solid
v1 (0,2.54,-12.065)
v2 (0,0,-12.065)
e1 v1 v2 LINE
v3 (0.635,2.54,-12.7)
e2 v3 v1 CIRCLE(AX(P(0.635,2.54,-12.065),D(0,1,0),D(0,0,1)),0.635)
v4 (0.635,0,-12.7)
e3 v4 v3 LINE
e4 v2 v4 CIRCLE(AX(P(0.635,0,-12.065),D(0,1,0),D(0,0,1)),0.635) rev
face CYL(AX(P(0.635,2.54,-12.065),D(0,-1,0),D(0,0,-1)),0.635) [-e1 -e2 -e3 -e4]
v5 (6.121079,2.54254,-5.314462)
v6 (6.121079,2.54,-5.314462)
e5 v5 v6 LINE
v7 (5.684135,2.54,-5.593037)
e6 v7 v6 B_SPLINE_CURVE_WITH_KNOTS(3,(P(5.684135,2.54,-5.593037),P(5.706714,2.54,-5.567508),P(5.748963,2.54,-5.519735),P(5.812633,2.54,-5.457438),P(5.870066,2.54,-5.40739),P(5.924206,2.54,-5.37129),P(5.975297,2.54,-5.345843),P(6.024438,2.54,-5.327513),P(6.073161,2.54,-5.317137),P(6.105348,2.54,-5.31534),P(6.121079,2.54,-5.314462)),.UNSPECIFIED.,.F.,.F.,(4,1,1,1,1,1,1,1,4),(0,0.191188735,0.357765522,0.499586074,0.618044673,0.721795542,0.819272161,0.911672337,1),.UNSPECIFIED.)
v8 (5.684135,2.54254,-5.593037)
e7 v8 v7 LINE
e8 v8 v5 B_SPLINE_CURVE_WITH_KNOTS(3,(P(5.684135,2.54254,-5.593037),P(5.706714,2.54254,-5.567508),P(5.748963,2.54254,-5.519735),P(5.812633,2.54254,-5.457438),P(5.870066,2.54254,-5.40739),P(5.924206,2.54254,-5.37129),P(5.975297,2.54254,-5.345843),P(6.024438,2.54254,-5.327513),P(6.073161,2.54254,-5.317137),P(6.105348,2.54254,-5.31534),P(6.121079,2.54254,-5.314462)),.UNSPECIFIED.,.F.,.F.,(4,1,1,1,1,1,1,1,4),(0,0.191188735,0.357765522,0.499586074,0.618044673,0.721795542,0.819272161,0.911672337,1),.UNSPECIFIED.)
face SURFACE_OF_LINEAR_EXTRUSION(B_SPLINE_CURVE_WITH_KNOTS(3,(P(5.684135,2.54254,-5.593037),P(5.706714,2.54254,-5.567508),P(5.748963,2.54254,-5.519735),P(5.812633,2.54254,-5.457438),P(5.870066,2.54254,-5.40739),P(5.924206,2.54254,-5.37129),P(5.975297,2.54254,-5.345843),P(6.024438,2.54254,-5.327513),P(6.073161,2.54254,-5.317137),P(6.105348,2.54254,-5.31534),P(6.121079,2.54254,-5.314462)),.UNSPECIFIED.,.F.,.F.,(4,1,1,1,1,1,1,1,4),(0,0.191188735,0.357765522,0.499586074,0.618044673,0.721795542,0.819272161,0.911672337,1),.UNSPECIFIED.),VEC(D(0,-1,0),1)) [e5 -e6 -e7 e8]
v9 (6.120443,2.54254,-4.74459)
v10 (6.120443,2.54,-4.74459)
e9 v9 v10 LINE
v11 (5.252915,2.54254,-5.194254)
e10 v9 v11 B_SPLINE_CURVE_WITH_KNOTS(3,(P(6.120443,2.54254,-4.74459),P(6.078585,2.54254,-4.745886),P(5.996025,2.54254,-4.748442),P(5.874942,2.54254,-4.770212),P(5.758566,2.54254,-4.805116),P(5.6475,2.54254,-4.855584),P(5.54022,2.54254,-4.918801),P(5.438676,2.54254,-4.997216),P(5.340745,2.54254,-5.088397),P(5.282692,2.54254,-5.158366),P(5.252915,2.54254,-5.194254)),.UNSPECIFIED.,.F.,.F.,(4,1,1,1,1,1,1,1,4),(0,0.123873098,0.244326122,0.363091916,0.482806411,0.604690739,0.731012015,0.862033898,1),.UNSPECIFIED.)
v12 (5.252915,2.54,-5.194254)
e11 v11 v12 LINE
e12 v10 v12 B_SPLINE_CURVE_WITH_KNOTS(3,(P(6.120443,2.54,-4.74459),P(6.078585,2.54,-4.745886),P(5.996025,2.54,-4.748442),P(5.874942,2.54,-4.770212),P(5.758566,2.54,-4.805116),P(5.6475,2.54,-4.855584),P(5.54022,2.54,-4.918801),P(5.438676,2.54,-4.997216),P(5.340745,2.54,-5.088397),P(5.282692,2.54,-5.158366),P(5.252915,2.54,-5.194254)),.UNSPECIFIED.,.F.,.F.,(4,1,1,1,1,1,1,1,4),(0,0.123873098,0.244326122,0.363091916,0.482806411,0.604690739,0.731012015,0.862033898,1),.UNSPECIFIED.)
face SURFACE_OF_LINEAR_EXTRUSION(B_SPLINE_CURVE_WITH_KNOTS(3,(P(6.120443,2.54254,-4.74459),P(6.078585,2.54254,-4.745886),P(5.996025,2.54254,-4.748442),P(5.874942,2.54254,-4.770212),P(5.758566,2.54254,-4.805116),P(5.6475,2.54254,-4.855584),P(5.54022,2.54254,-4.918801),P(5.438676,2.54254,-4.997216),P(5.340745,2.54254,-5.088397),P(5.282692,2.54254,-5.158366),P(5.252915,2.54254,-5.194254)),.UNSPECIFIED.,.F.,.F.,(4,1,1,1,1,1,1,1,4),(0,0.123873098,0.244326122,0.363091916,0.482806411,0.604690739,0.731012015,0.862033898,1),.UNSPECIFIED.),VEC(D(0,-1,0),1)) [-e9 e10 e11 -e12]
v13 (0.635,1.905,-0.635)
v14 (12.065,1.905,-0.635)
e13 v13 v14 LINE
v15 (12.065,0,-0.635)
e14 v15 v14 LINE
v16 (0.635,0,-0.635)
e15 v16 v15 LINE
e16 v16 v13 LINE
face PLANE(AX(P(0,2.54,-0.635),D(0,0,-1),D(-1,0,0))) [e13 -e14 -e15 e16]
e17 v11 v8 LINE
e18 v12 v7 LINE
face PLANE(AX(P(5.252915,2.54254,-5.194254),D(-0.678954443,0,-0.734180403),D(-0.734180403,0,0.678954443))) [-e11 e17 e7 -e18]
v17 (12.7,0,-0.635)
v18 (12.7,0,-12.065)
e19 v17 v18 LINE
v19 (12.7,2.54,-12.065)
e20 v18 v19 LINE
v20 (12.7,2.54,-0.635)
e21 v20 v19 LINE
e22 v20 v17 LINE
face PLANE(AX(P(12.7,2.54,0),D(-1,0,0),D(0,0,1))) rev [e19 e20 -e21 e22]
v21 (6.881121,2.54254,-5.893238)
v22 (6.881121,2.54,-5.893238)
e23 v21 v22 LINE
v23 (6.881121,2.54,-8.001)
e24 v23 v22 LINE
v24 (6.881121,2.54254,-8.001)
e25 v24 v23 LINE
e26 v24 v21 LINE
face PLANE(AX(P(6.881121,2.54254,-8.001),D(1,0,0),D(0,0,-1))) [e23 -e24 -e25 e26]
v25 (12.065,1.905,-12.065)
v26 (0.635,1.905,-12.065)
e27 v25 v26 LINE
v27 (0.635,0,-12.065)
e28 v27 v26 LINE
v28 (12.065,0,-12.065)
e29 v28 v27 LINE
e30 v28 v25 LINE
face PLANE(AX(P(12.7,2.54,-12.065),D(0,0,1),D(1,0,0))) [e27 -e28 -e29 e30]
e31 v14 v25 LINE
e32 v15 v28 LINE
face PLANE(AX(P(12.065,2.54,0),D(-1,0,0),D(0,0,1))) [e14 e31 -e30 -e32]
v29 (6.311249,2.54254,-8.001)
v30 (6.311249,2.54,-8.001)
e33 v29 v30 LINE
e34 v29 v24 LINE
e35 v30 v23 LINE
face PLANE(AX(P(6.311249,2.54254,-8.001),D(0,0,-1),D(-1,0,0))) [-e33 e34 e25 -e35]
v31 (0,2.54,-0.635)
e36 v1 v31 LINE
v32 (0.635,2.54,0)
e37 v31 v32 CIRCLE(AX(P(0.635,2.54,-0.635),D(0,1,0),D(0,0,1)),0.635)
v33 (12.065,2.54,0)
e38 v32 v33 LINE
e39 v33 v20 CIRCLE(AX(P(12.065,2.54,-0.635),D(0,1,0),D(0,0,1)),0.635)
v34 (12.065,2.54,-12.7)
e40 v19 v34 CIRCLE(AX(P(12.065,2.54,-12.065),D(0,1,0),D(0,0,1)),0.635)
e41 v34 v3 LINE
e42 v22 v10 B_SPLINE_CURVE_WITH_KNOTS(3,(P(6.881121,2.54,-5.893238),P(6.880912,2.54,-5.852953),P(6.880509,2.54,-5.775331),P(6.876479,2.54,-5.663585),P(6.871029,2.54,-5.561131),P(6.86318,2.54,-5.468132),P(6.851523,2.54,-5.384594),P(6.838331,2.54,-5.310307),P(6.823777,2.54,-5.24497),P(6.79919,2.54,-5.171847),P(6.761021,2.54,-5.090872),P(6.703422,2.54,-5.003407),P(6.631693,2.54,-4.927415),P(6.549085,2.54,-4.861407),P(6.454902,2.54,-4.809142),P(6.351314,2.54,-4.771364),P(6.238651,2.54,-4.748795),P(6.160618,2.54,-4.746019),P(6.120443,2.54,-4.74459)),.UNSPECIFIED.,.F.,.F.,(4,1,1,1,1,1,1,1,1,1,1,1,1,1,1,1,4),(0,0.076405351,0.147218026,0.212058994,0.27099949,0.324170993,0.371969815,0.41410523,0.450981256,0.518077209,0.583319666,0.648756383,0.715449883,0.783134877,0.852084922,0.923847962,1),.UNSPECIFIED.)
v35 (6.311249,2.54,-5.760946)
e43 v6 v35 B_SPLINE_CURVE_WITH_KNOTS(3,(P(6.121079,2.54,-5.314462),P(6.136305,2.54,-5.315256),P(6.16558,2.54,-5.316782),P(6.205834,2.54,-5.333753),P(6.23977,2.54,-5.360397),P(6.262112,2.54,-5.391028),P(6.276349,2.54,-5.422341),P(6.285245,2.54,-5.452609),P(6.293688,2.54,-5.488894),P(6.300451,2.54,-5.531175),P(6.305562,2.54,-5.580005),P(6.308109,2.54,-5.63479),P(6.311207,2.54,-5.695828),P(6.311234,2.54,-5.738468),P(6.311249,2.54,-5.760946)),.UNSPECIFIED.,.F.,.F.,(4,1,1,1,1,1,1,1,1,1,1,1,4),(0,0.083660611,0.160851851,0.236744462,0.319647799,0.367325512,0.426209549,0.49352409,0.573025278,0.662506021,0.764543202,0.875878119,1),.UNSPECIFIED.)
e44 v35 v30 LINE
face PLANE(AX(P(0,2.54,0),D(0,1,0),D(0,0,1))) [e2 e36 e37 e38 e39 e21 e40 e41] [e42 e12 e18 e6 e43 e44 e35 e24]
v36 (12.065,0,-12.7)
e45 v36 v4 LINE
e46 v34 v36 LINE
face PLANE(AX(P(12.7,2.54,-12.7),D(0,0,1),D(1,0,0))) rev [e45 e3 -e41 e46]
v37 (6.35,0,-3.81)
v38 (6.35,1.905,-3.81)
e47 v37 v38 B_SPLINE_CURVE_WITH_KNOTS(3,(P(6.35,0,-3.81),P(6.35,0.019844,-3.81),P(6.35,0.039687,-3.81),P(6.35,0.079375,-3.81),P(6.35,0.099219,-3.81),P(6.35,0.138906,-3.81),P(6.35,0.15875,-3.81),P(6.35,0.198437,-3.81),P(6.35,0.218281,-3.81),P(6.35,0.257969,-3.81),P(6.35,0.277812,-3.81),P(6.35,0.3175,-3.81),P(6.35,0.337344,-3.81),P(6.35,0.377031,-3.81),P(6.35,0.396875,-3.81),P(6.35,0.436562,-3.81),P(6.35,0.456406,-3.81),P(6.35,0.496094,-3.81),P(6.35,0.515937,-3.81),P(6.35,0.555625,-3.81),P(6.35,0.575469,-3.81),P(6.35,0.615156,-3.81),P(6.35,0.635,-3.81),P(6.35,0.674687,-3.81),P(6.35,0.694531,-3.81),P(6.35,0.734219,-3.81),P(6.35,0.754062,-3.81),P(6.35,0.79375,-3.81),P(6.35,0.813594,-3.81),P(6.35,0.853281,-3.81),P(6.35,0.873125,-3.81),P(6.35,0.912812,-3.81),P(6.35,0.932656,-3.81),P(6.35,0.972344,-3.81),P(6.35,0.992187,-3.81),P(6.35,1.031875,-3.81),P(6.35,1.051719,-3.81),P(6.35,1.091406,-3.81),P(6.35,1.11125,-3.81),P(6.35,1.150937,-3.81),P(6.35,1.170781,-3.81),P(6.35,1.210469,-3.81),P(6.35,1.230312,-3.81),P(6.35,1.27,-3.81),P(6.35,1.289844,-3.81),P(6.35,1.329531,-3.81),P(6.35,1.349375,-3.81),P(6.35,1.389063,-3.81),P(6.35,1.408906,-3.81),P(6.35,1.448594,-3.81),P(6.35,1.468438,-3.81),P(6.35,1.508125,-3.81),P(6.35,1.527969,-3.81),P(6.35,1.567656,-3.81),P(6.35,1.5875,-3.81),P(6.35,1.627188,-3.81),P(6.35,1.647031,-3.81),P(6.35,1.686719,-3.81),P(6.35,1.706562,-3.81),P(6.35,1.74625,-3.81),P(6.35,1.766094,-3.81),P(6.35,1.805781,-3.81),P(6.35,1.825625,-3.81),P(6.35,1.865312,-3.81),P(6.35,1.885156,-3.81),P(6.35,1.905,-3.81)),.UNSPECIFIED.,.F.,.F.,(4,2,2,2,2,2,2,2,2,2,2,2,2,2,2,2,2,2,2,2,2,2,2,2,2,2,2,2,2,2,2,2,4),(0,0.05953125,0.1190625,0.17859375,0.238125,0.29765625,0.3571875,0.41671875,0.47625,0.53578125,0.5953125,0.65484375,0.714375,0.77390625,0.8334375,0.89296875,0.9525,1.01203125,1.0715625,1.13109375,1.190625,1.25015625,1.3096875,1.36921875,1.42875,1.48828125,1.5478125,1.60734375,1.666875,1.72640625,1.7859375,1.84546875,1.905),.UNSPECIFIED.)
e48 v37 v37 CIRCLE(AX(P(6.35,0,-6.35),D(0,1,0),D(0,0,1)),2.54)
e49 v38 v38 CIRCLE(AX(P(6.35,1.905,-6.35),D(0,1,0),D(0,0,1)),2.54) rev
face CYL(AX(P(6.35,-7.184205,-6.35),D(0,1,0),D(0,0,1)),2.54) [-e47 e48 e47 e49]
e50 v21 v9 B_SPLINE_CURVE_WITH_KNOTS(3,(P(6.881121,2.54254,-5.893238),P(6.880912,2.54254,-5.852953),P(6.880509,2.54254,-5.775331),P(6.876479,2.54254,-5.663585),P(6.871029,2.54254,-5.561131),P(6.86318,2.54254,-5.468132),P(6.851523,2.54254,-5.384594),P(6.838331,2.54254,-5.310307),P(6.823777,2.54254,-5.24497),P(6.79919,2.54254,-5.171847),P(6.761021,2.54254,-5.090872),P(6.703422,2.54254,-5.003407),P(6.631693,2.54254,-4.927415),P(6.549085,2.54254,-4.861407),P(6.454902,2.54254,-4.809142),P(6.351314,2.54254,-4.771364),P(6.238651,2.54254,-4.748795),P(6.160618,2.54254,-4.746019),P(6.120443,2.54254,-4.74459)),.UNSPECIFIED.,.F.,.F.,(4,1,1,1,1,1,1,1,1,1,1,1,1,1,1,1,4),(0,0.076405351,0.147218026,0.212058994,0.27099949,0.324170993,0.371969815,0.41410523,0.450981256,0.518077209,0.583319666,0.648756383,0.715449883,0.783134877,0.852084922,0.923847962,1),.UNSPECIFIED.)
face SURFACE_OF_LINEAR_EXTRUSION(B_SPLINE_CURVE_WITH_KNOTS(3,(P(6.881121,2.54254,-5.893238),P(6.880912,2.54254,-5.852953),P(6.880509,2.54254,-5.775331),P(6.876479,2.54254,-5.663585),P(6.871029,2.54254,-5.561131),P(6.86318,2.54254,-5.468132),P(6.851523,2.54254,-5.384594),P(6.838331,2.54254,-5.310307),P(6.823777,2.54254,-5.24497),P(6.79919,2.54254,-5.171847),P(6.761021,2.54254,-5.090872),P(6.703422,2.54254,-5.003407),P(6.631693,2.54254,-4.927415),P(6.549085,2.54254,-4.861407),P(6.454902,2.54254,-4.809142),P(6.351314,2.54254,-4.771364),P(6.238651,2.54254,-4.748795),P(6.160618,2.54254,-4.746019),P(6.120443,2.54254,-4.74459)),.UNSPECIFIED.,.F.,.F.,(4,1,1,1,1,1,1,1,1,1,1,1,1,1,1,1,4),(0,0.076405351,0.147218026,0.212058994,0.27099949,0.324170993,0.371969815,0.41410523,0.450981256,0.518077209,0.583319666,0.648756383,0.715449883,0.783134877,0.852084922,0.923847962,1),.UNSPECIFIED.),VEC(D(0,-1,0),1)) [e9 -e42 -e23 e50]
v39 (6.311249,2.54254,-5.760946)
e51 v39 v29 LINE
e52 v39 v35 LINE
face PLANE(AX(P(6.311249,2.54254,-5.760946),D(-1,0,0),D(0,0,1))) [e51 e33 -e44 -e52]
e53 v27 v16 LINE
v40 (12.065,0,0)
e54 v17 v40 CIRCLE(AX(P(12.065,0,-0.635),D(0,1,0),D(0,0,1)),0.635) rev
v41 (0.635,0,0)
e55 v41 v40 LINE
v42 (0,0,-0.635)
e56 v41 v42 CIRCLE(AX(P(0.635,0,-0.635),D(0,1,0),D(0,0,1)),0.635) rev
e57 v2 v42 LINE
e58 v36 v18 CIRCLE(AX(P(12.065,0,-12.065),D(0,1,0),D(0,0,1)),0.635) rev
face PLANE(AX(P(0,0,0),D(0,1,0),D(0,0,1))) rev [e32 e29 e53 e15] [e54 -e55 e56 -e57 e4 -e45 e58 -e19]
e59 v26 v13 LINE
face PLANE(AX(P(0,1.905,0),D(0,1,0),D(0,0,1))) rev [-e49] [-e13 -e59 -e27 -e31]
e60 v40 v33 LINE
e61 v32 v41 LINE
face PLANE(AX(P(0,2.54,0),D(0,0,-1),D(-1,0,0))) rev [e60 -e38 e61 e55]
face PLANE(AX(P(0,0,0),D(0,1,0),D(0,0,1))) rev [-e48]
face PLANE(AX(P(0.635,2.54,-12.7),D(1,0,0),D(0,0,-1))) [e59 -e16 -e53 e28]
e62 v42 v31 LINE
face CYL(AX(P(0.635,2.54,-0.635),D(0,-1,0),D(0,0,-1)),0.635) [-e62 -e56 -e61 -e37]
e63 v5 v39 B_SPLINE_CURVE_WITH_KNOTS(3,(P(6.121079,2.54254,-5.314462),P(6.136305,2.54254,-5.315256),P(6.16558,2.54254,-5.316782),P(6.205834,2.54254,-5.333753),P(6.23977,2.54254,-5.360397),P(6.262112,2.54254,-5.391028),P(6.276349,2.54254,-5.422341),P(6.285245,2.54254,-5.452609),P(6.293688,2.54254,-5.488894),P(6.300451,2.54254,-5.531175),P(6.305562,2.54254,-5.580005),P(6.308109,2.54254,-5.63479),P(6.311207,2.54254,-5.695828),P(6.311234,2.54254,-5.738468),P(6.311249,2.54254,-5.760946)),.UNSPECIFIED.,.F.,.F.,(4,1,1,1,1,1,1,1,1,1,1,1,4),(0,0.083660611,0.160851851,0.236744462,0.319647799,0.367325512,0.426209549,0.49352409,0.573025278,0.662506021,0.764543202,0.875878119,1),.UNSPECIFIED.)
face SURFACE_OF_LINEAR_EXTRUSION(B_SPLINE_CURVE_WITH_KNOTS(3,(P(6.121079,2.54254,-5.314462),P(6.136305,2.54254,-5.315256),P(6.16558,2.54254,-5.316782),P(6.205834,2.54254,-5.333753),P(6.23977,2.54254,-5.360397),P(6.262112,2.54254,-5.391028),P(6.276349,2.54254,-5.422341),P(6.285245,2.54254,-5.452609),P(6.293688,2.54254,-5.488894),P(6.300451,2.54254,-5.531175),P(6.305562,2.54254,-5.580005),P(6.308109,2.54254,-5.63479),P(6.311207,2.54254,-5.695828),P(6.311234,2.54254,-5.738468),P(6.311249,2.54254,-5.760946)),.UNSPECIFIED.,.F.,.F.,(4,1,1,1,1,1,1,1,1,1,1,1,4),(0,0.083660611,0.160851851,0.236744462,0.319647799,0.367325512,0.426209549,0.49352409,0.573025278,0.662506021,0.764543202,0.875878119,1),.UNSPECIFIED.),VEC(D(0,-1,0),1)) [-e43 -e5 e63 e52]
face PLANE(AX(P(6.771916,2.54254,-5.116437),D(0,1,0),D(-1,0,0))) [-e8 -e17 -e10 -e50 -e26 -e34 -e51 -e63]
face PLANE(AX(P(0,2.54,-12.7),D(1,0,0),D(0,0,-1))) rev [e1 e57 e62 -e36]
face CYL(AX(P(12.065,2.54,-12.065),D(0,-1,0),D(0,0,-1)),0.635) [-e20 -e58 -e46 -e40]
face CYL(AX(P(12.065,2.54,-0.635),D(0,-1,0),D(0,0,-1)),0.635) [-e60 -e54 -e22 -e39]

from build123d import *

# Parameters (mm, degrees)
SKETCH1_W           = 12.7
SKETCH1_H           = 12.7
BOSS_EXTRUDE1_DEPTH = 2.54
FILLET1_R           = 0.635
SHELL1_START        = 0.635
SHELL1_OUTLINE_W    = 1.905
SHELL1_OUTLINE_H    = 11.43
SHELL1_DEPTH        = 11.43
SKETCH2_R           = 2.54
BOSS_EXTRUDE2_DEPTH = 1.905
BOSS_EXTRUDE3_DEPTH = 0.00254


# Read off the part's stored shape, not the designer's step: Shell1
with BuildPart() as part:
    # Sketch1 → Boss-Extrude1 (new body)
    with BuildSketch(Plane(origin=(0, 0, 0), x_dir=(1, 0, 0), z_dir=(0, 1, 0))):
        with Locations((6.35, 6.35)):
            Rectangle(SKETCH1_W, SKETCH1_H)
    extrude(amount=BOSS_EXTRUDE1_DEPTH)

    # Fillet1
    fillet1_edges = [part.edges().sort_by_distance(p)[0] for p in [
        (0, 1.27, -12.7),
        (12.7, 1.27, -12.7),
        (12.7, 1.27, 0),
        (0, 1.27, 0),
    ]]
    fillet(fillet1_edges, radius=FILLET1_R)

    # Shell1 outline → Shell1 (cut)
    with BuildSketch(Plane.YZ.offset(SHELL1_START)):
        with Locations((0.9525, -6.35)):
            Rectangle(SHELL1_OUTLINE_W, SHELL1_OUTLINE_H)
    extrude(amount=SHELL1_DEPTH, mode=Mode.SUBTRACT)

    # Sketch2 → Boss-Extrude2 (add)
    with BuildSketch(Plane(origin=(0, 1.905, 0), x_dir=(-1, 0, 0), z_dir=(0, -1, 0))):
        with Locations(Location((-6.35, 6.35, 0), (0, 0, 270))):
            Circle(SKETCH2_R)
    extrude(amount=BOSS_EXTRUDE2_DEPTH)

    # Sketch3 → Boss-Extrude3 (add)
    with BuildSketch(Plane(origin=(0, 2.54, 0), x_dir=(1, 0, 0), z_dir=(0, 1, 0))):
        with BuildLine():
            Line((6.311248718, 8.001), (6.881120513, 8.001))
            Line((6.881120513, 8.001), (6.881120513, 5.89323758))
            add(Edge.make_bspline(
                [(6.881120513, 5.89323758), (6.880911581, 5.85295254), (6.88050901, 5.775331222), (6.876478561, 5.663585177), (6.871028683, 5.561130731), (6.863180334, 5.468132049), (6.851523386, 5.384593628), (6.83833126, 5.310307047), (6.823776683, 5.24496961), (6.799190432, 5.171846852), (6.76102099, 5.090871717), (6.703422211, 5.003407063), (6.631693296, 4.927415182), (6.549085279, 4.861407451), (6.454902126, 4.809141814), (6.351313596, 4.771364071), (6.238650837, 4.748795386), (6.160617709, 4.746019084), (6.120443429, 4.744589744)],
                knots=[0, 0, 0, 0, 1.22248561, 2.355488409, 3.392943897, 4.335991845, 5.186735882, 5.951517034, 6.625683685, 7.215700098, 8.28923535, 9.333114649, 10.380102123, 11.447198135, 12.530158036, 13.633358744, 14.781567393, 16, 16, 16, 16], degree=3))
            add(Edge.make_bspline(
                [(6.120443429, 4.744589744), (6.078585486, 4.745885617), (5.996025276, 4.748441587), (5.874942226, 4.77021188), (5.758566278, 4.80511621), (5.647499501, 4.855583683), (5.540220246, 4.918801011), (5.438675534, 4.997215953), (5.34074525, 5.088396519), (5.282691579, 5.158366196), (5.252915385, 5.194254207)],
                knots=[0, 0, 0, 0, 0.990984786, 1.954608977, 2.90473533, 3.862451285, 4.837525908, 5.848096122, 6.896271184, 8, 8, 8, 8], degree=3))
            Line((5.252915385, 5.194254207), (5.684135337, 5.59303726))
            add(Edge.make_bspline(
                [(5.684135337, 5.59303726), (5.706713527, 5.567507703), (5.74896339, 5.519735039), (5.812632688, 5.457438312), (5.870065826, 5.407390082), (5.924206265, 5.371289844), (5.975297298, 5.345843205), (6.024438185, 5.327513276), (6.073160718, 5.317137495), (6.105348309, 5.315340023), (6.121079447, 5.314461538)],
                knots=[0, 0, 0, 0, 1.529509877, 2.862124173, 3.996688592, 4.944357383, 5.774364335, 6.554177287, 7.293378699, 8, 8, 8, 8], degree=3))
            add(Edge.make_bspline(
                [(6.121079447, 5.314461538), (6.136305438, 5.315255549), (6.165580013, 5.316782171), (6.205833677, 5.333752509), (6.239770106, 5.360396654), (6.262111848, 5.391027555), (6.27634945, 5.422340582), (6.285245372, 5.452609437), (6.293687618, 5.48889359), (6.300451357, 5.531174856), (6.30556205, 5.580004736), (6.308109361, 5.634790439), (6.311207218, 5.695828017), (6.311234393, 5.738468063), (6.311248718, 5.760945913)],
                knots=[0, 0, 0, 0, 1.003927327, 1.930222208, 2.840933547, 3.835773585, 4.407906147, 5.114514582, 5.922289074, 6.876303333, 7.950072246, 9.174518422, 10.510537432, 12, 12, 12, 12], degree=3))
            Line((6.311248718, 5.760945913), (6.311248718, 8.001))
        make_face()
    extrude(amount=BOSS_EXTRUDE3_DEPTH)


solid = part.part
